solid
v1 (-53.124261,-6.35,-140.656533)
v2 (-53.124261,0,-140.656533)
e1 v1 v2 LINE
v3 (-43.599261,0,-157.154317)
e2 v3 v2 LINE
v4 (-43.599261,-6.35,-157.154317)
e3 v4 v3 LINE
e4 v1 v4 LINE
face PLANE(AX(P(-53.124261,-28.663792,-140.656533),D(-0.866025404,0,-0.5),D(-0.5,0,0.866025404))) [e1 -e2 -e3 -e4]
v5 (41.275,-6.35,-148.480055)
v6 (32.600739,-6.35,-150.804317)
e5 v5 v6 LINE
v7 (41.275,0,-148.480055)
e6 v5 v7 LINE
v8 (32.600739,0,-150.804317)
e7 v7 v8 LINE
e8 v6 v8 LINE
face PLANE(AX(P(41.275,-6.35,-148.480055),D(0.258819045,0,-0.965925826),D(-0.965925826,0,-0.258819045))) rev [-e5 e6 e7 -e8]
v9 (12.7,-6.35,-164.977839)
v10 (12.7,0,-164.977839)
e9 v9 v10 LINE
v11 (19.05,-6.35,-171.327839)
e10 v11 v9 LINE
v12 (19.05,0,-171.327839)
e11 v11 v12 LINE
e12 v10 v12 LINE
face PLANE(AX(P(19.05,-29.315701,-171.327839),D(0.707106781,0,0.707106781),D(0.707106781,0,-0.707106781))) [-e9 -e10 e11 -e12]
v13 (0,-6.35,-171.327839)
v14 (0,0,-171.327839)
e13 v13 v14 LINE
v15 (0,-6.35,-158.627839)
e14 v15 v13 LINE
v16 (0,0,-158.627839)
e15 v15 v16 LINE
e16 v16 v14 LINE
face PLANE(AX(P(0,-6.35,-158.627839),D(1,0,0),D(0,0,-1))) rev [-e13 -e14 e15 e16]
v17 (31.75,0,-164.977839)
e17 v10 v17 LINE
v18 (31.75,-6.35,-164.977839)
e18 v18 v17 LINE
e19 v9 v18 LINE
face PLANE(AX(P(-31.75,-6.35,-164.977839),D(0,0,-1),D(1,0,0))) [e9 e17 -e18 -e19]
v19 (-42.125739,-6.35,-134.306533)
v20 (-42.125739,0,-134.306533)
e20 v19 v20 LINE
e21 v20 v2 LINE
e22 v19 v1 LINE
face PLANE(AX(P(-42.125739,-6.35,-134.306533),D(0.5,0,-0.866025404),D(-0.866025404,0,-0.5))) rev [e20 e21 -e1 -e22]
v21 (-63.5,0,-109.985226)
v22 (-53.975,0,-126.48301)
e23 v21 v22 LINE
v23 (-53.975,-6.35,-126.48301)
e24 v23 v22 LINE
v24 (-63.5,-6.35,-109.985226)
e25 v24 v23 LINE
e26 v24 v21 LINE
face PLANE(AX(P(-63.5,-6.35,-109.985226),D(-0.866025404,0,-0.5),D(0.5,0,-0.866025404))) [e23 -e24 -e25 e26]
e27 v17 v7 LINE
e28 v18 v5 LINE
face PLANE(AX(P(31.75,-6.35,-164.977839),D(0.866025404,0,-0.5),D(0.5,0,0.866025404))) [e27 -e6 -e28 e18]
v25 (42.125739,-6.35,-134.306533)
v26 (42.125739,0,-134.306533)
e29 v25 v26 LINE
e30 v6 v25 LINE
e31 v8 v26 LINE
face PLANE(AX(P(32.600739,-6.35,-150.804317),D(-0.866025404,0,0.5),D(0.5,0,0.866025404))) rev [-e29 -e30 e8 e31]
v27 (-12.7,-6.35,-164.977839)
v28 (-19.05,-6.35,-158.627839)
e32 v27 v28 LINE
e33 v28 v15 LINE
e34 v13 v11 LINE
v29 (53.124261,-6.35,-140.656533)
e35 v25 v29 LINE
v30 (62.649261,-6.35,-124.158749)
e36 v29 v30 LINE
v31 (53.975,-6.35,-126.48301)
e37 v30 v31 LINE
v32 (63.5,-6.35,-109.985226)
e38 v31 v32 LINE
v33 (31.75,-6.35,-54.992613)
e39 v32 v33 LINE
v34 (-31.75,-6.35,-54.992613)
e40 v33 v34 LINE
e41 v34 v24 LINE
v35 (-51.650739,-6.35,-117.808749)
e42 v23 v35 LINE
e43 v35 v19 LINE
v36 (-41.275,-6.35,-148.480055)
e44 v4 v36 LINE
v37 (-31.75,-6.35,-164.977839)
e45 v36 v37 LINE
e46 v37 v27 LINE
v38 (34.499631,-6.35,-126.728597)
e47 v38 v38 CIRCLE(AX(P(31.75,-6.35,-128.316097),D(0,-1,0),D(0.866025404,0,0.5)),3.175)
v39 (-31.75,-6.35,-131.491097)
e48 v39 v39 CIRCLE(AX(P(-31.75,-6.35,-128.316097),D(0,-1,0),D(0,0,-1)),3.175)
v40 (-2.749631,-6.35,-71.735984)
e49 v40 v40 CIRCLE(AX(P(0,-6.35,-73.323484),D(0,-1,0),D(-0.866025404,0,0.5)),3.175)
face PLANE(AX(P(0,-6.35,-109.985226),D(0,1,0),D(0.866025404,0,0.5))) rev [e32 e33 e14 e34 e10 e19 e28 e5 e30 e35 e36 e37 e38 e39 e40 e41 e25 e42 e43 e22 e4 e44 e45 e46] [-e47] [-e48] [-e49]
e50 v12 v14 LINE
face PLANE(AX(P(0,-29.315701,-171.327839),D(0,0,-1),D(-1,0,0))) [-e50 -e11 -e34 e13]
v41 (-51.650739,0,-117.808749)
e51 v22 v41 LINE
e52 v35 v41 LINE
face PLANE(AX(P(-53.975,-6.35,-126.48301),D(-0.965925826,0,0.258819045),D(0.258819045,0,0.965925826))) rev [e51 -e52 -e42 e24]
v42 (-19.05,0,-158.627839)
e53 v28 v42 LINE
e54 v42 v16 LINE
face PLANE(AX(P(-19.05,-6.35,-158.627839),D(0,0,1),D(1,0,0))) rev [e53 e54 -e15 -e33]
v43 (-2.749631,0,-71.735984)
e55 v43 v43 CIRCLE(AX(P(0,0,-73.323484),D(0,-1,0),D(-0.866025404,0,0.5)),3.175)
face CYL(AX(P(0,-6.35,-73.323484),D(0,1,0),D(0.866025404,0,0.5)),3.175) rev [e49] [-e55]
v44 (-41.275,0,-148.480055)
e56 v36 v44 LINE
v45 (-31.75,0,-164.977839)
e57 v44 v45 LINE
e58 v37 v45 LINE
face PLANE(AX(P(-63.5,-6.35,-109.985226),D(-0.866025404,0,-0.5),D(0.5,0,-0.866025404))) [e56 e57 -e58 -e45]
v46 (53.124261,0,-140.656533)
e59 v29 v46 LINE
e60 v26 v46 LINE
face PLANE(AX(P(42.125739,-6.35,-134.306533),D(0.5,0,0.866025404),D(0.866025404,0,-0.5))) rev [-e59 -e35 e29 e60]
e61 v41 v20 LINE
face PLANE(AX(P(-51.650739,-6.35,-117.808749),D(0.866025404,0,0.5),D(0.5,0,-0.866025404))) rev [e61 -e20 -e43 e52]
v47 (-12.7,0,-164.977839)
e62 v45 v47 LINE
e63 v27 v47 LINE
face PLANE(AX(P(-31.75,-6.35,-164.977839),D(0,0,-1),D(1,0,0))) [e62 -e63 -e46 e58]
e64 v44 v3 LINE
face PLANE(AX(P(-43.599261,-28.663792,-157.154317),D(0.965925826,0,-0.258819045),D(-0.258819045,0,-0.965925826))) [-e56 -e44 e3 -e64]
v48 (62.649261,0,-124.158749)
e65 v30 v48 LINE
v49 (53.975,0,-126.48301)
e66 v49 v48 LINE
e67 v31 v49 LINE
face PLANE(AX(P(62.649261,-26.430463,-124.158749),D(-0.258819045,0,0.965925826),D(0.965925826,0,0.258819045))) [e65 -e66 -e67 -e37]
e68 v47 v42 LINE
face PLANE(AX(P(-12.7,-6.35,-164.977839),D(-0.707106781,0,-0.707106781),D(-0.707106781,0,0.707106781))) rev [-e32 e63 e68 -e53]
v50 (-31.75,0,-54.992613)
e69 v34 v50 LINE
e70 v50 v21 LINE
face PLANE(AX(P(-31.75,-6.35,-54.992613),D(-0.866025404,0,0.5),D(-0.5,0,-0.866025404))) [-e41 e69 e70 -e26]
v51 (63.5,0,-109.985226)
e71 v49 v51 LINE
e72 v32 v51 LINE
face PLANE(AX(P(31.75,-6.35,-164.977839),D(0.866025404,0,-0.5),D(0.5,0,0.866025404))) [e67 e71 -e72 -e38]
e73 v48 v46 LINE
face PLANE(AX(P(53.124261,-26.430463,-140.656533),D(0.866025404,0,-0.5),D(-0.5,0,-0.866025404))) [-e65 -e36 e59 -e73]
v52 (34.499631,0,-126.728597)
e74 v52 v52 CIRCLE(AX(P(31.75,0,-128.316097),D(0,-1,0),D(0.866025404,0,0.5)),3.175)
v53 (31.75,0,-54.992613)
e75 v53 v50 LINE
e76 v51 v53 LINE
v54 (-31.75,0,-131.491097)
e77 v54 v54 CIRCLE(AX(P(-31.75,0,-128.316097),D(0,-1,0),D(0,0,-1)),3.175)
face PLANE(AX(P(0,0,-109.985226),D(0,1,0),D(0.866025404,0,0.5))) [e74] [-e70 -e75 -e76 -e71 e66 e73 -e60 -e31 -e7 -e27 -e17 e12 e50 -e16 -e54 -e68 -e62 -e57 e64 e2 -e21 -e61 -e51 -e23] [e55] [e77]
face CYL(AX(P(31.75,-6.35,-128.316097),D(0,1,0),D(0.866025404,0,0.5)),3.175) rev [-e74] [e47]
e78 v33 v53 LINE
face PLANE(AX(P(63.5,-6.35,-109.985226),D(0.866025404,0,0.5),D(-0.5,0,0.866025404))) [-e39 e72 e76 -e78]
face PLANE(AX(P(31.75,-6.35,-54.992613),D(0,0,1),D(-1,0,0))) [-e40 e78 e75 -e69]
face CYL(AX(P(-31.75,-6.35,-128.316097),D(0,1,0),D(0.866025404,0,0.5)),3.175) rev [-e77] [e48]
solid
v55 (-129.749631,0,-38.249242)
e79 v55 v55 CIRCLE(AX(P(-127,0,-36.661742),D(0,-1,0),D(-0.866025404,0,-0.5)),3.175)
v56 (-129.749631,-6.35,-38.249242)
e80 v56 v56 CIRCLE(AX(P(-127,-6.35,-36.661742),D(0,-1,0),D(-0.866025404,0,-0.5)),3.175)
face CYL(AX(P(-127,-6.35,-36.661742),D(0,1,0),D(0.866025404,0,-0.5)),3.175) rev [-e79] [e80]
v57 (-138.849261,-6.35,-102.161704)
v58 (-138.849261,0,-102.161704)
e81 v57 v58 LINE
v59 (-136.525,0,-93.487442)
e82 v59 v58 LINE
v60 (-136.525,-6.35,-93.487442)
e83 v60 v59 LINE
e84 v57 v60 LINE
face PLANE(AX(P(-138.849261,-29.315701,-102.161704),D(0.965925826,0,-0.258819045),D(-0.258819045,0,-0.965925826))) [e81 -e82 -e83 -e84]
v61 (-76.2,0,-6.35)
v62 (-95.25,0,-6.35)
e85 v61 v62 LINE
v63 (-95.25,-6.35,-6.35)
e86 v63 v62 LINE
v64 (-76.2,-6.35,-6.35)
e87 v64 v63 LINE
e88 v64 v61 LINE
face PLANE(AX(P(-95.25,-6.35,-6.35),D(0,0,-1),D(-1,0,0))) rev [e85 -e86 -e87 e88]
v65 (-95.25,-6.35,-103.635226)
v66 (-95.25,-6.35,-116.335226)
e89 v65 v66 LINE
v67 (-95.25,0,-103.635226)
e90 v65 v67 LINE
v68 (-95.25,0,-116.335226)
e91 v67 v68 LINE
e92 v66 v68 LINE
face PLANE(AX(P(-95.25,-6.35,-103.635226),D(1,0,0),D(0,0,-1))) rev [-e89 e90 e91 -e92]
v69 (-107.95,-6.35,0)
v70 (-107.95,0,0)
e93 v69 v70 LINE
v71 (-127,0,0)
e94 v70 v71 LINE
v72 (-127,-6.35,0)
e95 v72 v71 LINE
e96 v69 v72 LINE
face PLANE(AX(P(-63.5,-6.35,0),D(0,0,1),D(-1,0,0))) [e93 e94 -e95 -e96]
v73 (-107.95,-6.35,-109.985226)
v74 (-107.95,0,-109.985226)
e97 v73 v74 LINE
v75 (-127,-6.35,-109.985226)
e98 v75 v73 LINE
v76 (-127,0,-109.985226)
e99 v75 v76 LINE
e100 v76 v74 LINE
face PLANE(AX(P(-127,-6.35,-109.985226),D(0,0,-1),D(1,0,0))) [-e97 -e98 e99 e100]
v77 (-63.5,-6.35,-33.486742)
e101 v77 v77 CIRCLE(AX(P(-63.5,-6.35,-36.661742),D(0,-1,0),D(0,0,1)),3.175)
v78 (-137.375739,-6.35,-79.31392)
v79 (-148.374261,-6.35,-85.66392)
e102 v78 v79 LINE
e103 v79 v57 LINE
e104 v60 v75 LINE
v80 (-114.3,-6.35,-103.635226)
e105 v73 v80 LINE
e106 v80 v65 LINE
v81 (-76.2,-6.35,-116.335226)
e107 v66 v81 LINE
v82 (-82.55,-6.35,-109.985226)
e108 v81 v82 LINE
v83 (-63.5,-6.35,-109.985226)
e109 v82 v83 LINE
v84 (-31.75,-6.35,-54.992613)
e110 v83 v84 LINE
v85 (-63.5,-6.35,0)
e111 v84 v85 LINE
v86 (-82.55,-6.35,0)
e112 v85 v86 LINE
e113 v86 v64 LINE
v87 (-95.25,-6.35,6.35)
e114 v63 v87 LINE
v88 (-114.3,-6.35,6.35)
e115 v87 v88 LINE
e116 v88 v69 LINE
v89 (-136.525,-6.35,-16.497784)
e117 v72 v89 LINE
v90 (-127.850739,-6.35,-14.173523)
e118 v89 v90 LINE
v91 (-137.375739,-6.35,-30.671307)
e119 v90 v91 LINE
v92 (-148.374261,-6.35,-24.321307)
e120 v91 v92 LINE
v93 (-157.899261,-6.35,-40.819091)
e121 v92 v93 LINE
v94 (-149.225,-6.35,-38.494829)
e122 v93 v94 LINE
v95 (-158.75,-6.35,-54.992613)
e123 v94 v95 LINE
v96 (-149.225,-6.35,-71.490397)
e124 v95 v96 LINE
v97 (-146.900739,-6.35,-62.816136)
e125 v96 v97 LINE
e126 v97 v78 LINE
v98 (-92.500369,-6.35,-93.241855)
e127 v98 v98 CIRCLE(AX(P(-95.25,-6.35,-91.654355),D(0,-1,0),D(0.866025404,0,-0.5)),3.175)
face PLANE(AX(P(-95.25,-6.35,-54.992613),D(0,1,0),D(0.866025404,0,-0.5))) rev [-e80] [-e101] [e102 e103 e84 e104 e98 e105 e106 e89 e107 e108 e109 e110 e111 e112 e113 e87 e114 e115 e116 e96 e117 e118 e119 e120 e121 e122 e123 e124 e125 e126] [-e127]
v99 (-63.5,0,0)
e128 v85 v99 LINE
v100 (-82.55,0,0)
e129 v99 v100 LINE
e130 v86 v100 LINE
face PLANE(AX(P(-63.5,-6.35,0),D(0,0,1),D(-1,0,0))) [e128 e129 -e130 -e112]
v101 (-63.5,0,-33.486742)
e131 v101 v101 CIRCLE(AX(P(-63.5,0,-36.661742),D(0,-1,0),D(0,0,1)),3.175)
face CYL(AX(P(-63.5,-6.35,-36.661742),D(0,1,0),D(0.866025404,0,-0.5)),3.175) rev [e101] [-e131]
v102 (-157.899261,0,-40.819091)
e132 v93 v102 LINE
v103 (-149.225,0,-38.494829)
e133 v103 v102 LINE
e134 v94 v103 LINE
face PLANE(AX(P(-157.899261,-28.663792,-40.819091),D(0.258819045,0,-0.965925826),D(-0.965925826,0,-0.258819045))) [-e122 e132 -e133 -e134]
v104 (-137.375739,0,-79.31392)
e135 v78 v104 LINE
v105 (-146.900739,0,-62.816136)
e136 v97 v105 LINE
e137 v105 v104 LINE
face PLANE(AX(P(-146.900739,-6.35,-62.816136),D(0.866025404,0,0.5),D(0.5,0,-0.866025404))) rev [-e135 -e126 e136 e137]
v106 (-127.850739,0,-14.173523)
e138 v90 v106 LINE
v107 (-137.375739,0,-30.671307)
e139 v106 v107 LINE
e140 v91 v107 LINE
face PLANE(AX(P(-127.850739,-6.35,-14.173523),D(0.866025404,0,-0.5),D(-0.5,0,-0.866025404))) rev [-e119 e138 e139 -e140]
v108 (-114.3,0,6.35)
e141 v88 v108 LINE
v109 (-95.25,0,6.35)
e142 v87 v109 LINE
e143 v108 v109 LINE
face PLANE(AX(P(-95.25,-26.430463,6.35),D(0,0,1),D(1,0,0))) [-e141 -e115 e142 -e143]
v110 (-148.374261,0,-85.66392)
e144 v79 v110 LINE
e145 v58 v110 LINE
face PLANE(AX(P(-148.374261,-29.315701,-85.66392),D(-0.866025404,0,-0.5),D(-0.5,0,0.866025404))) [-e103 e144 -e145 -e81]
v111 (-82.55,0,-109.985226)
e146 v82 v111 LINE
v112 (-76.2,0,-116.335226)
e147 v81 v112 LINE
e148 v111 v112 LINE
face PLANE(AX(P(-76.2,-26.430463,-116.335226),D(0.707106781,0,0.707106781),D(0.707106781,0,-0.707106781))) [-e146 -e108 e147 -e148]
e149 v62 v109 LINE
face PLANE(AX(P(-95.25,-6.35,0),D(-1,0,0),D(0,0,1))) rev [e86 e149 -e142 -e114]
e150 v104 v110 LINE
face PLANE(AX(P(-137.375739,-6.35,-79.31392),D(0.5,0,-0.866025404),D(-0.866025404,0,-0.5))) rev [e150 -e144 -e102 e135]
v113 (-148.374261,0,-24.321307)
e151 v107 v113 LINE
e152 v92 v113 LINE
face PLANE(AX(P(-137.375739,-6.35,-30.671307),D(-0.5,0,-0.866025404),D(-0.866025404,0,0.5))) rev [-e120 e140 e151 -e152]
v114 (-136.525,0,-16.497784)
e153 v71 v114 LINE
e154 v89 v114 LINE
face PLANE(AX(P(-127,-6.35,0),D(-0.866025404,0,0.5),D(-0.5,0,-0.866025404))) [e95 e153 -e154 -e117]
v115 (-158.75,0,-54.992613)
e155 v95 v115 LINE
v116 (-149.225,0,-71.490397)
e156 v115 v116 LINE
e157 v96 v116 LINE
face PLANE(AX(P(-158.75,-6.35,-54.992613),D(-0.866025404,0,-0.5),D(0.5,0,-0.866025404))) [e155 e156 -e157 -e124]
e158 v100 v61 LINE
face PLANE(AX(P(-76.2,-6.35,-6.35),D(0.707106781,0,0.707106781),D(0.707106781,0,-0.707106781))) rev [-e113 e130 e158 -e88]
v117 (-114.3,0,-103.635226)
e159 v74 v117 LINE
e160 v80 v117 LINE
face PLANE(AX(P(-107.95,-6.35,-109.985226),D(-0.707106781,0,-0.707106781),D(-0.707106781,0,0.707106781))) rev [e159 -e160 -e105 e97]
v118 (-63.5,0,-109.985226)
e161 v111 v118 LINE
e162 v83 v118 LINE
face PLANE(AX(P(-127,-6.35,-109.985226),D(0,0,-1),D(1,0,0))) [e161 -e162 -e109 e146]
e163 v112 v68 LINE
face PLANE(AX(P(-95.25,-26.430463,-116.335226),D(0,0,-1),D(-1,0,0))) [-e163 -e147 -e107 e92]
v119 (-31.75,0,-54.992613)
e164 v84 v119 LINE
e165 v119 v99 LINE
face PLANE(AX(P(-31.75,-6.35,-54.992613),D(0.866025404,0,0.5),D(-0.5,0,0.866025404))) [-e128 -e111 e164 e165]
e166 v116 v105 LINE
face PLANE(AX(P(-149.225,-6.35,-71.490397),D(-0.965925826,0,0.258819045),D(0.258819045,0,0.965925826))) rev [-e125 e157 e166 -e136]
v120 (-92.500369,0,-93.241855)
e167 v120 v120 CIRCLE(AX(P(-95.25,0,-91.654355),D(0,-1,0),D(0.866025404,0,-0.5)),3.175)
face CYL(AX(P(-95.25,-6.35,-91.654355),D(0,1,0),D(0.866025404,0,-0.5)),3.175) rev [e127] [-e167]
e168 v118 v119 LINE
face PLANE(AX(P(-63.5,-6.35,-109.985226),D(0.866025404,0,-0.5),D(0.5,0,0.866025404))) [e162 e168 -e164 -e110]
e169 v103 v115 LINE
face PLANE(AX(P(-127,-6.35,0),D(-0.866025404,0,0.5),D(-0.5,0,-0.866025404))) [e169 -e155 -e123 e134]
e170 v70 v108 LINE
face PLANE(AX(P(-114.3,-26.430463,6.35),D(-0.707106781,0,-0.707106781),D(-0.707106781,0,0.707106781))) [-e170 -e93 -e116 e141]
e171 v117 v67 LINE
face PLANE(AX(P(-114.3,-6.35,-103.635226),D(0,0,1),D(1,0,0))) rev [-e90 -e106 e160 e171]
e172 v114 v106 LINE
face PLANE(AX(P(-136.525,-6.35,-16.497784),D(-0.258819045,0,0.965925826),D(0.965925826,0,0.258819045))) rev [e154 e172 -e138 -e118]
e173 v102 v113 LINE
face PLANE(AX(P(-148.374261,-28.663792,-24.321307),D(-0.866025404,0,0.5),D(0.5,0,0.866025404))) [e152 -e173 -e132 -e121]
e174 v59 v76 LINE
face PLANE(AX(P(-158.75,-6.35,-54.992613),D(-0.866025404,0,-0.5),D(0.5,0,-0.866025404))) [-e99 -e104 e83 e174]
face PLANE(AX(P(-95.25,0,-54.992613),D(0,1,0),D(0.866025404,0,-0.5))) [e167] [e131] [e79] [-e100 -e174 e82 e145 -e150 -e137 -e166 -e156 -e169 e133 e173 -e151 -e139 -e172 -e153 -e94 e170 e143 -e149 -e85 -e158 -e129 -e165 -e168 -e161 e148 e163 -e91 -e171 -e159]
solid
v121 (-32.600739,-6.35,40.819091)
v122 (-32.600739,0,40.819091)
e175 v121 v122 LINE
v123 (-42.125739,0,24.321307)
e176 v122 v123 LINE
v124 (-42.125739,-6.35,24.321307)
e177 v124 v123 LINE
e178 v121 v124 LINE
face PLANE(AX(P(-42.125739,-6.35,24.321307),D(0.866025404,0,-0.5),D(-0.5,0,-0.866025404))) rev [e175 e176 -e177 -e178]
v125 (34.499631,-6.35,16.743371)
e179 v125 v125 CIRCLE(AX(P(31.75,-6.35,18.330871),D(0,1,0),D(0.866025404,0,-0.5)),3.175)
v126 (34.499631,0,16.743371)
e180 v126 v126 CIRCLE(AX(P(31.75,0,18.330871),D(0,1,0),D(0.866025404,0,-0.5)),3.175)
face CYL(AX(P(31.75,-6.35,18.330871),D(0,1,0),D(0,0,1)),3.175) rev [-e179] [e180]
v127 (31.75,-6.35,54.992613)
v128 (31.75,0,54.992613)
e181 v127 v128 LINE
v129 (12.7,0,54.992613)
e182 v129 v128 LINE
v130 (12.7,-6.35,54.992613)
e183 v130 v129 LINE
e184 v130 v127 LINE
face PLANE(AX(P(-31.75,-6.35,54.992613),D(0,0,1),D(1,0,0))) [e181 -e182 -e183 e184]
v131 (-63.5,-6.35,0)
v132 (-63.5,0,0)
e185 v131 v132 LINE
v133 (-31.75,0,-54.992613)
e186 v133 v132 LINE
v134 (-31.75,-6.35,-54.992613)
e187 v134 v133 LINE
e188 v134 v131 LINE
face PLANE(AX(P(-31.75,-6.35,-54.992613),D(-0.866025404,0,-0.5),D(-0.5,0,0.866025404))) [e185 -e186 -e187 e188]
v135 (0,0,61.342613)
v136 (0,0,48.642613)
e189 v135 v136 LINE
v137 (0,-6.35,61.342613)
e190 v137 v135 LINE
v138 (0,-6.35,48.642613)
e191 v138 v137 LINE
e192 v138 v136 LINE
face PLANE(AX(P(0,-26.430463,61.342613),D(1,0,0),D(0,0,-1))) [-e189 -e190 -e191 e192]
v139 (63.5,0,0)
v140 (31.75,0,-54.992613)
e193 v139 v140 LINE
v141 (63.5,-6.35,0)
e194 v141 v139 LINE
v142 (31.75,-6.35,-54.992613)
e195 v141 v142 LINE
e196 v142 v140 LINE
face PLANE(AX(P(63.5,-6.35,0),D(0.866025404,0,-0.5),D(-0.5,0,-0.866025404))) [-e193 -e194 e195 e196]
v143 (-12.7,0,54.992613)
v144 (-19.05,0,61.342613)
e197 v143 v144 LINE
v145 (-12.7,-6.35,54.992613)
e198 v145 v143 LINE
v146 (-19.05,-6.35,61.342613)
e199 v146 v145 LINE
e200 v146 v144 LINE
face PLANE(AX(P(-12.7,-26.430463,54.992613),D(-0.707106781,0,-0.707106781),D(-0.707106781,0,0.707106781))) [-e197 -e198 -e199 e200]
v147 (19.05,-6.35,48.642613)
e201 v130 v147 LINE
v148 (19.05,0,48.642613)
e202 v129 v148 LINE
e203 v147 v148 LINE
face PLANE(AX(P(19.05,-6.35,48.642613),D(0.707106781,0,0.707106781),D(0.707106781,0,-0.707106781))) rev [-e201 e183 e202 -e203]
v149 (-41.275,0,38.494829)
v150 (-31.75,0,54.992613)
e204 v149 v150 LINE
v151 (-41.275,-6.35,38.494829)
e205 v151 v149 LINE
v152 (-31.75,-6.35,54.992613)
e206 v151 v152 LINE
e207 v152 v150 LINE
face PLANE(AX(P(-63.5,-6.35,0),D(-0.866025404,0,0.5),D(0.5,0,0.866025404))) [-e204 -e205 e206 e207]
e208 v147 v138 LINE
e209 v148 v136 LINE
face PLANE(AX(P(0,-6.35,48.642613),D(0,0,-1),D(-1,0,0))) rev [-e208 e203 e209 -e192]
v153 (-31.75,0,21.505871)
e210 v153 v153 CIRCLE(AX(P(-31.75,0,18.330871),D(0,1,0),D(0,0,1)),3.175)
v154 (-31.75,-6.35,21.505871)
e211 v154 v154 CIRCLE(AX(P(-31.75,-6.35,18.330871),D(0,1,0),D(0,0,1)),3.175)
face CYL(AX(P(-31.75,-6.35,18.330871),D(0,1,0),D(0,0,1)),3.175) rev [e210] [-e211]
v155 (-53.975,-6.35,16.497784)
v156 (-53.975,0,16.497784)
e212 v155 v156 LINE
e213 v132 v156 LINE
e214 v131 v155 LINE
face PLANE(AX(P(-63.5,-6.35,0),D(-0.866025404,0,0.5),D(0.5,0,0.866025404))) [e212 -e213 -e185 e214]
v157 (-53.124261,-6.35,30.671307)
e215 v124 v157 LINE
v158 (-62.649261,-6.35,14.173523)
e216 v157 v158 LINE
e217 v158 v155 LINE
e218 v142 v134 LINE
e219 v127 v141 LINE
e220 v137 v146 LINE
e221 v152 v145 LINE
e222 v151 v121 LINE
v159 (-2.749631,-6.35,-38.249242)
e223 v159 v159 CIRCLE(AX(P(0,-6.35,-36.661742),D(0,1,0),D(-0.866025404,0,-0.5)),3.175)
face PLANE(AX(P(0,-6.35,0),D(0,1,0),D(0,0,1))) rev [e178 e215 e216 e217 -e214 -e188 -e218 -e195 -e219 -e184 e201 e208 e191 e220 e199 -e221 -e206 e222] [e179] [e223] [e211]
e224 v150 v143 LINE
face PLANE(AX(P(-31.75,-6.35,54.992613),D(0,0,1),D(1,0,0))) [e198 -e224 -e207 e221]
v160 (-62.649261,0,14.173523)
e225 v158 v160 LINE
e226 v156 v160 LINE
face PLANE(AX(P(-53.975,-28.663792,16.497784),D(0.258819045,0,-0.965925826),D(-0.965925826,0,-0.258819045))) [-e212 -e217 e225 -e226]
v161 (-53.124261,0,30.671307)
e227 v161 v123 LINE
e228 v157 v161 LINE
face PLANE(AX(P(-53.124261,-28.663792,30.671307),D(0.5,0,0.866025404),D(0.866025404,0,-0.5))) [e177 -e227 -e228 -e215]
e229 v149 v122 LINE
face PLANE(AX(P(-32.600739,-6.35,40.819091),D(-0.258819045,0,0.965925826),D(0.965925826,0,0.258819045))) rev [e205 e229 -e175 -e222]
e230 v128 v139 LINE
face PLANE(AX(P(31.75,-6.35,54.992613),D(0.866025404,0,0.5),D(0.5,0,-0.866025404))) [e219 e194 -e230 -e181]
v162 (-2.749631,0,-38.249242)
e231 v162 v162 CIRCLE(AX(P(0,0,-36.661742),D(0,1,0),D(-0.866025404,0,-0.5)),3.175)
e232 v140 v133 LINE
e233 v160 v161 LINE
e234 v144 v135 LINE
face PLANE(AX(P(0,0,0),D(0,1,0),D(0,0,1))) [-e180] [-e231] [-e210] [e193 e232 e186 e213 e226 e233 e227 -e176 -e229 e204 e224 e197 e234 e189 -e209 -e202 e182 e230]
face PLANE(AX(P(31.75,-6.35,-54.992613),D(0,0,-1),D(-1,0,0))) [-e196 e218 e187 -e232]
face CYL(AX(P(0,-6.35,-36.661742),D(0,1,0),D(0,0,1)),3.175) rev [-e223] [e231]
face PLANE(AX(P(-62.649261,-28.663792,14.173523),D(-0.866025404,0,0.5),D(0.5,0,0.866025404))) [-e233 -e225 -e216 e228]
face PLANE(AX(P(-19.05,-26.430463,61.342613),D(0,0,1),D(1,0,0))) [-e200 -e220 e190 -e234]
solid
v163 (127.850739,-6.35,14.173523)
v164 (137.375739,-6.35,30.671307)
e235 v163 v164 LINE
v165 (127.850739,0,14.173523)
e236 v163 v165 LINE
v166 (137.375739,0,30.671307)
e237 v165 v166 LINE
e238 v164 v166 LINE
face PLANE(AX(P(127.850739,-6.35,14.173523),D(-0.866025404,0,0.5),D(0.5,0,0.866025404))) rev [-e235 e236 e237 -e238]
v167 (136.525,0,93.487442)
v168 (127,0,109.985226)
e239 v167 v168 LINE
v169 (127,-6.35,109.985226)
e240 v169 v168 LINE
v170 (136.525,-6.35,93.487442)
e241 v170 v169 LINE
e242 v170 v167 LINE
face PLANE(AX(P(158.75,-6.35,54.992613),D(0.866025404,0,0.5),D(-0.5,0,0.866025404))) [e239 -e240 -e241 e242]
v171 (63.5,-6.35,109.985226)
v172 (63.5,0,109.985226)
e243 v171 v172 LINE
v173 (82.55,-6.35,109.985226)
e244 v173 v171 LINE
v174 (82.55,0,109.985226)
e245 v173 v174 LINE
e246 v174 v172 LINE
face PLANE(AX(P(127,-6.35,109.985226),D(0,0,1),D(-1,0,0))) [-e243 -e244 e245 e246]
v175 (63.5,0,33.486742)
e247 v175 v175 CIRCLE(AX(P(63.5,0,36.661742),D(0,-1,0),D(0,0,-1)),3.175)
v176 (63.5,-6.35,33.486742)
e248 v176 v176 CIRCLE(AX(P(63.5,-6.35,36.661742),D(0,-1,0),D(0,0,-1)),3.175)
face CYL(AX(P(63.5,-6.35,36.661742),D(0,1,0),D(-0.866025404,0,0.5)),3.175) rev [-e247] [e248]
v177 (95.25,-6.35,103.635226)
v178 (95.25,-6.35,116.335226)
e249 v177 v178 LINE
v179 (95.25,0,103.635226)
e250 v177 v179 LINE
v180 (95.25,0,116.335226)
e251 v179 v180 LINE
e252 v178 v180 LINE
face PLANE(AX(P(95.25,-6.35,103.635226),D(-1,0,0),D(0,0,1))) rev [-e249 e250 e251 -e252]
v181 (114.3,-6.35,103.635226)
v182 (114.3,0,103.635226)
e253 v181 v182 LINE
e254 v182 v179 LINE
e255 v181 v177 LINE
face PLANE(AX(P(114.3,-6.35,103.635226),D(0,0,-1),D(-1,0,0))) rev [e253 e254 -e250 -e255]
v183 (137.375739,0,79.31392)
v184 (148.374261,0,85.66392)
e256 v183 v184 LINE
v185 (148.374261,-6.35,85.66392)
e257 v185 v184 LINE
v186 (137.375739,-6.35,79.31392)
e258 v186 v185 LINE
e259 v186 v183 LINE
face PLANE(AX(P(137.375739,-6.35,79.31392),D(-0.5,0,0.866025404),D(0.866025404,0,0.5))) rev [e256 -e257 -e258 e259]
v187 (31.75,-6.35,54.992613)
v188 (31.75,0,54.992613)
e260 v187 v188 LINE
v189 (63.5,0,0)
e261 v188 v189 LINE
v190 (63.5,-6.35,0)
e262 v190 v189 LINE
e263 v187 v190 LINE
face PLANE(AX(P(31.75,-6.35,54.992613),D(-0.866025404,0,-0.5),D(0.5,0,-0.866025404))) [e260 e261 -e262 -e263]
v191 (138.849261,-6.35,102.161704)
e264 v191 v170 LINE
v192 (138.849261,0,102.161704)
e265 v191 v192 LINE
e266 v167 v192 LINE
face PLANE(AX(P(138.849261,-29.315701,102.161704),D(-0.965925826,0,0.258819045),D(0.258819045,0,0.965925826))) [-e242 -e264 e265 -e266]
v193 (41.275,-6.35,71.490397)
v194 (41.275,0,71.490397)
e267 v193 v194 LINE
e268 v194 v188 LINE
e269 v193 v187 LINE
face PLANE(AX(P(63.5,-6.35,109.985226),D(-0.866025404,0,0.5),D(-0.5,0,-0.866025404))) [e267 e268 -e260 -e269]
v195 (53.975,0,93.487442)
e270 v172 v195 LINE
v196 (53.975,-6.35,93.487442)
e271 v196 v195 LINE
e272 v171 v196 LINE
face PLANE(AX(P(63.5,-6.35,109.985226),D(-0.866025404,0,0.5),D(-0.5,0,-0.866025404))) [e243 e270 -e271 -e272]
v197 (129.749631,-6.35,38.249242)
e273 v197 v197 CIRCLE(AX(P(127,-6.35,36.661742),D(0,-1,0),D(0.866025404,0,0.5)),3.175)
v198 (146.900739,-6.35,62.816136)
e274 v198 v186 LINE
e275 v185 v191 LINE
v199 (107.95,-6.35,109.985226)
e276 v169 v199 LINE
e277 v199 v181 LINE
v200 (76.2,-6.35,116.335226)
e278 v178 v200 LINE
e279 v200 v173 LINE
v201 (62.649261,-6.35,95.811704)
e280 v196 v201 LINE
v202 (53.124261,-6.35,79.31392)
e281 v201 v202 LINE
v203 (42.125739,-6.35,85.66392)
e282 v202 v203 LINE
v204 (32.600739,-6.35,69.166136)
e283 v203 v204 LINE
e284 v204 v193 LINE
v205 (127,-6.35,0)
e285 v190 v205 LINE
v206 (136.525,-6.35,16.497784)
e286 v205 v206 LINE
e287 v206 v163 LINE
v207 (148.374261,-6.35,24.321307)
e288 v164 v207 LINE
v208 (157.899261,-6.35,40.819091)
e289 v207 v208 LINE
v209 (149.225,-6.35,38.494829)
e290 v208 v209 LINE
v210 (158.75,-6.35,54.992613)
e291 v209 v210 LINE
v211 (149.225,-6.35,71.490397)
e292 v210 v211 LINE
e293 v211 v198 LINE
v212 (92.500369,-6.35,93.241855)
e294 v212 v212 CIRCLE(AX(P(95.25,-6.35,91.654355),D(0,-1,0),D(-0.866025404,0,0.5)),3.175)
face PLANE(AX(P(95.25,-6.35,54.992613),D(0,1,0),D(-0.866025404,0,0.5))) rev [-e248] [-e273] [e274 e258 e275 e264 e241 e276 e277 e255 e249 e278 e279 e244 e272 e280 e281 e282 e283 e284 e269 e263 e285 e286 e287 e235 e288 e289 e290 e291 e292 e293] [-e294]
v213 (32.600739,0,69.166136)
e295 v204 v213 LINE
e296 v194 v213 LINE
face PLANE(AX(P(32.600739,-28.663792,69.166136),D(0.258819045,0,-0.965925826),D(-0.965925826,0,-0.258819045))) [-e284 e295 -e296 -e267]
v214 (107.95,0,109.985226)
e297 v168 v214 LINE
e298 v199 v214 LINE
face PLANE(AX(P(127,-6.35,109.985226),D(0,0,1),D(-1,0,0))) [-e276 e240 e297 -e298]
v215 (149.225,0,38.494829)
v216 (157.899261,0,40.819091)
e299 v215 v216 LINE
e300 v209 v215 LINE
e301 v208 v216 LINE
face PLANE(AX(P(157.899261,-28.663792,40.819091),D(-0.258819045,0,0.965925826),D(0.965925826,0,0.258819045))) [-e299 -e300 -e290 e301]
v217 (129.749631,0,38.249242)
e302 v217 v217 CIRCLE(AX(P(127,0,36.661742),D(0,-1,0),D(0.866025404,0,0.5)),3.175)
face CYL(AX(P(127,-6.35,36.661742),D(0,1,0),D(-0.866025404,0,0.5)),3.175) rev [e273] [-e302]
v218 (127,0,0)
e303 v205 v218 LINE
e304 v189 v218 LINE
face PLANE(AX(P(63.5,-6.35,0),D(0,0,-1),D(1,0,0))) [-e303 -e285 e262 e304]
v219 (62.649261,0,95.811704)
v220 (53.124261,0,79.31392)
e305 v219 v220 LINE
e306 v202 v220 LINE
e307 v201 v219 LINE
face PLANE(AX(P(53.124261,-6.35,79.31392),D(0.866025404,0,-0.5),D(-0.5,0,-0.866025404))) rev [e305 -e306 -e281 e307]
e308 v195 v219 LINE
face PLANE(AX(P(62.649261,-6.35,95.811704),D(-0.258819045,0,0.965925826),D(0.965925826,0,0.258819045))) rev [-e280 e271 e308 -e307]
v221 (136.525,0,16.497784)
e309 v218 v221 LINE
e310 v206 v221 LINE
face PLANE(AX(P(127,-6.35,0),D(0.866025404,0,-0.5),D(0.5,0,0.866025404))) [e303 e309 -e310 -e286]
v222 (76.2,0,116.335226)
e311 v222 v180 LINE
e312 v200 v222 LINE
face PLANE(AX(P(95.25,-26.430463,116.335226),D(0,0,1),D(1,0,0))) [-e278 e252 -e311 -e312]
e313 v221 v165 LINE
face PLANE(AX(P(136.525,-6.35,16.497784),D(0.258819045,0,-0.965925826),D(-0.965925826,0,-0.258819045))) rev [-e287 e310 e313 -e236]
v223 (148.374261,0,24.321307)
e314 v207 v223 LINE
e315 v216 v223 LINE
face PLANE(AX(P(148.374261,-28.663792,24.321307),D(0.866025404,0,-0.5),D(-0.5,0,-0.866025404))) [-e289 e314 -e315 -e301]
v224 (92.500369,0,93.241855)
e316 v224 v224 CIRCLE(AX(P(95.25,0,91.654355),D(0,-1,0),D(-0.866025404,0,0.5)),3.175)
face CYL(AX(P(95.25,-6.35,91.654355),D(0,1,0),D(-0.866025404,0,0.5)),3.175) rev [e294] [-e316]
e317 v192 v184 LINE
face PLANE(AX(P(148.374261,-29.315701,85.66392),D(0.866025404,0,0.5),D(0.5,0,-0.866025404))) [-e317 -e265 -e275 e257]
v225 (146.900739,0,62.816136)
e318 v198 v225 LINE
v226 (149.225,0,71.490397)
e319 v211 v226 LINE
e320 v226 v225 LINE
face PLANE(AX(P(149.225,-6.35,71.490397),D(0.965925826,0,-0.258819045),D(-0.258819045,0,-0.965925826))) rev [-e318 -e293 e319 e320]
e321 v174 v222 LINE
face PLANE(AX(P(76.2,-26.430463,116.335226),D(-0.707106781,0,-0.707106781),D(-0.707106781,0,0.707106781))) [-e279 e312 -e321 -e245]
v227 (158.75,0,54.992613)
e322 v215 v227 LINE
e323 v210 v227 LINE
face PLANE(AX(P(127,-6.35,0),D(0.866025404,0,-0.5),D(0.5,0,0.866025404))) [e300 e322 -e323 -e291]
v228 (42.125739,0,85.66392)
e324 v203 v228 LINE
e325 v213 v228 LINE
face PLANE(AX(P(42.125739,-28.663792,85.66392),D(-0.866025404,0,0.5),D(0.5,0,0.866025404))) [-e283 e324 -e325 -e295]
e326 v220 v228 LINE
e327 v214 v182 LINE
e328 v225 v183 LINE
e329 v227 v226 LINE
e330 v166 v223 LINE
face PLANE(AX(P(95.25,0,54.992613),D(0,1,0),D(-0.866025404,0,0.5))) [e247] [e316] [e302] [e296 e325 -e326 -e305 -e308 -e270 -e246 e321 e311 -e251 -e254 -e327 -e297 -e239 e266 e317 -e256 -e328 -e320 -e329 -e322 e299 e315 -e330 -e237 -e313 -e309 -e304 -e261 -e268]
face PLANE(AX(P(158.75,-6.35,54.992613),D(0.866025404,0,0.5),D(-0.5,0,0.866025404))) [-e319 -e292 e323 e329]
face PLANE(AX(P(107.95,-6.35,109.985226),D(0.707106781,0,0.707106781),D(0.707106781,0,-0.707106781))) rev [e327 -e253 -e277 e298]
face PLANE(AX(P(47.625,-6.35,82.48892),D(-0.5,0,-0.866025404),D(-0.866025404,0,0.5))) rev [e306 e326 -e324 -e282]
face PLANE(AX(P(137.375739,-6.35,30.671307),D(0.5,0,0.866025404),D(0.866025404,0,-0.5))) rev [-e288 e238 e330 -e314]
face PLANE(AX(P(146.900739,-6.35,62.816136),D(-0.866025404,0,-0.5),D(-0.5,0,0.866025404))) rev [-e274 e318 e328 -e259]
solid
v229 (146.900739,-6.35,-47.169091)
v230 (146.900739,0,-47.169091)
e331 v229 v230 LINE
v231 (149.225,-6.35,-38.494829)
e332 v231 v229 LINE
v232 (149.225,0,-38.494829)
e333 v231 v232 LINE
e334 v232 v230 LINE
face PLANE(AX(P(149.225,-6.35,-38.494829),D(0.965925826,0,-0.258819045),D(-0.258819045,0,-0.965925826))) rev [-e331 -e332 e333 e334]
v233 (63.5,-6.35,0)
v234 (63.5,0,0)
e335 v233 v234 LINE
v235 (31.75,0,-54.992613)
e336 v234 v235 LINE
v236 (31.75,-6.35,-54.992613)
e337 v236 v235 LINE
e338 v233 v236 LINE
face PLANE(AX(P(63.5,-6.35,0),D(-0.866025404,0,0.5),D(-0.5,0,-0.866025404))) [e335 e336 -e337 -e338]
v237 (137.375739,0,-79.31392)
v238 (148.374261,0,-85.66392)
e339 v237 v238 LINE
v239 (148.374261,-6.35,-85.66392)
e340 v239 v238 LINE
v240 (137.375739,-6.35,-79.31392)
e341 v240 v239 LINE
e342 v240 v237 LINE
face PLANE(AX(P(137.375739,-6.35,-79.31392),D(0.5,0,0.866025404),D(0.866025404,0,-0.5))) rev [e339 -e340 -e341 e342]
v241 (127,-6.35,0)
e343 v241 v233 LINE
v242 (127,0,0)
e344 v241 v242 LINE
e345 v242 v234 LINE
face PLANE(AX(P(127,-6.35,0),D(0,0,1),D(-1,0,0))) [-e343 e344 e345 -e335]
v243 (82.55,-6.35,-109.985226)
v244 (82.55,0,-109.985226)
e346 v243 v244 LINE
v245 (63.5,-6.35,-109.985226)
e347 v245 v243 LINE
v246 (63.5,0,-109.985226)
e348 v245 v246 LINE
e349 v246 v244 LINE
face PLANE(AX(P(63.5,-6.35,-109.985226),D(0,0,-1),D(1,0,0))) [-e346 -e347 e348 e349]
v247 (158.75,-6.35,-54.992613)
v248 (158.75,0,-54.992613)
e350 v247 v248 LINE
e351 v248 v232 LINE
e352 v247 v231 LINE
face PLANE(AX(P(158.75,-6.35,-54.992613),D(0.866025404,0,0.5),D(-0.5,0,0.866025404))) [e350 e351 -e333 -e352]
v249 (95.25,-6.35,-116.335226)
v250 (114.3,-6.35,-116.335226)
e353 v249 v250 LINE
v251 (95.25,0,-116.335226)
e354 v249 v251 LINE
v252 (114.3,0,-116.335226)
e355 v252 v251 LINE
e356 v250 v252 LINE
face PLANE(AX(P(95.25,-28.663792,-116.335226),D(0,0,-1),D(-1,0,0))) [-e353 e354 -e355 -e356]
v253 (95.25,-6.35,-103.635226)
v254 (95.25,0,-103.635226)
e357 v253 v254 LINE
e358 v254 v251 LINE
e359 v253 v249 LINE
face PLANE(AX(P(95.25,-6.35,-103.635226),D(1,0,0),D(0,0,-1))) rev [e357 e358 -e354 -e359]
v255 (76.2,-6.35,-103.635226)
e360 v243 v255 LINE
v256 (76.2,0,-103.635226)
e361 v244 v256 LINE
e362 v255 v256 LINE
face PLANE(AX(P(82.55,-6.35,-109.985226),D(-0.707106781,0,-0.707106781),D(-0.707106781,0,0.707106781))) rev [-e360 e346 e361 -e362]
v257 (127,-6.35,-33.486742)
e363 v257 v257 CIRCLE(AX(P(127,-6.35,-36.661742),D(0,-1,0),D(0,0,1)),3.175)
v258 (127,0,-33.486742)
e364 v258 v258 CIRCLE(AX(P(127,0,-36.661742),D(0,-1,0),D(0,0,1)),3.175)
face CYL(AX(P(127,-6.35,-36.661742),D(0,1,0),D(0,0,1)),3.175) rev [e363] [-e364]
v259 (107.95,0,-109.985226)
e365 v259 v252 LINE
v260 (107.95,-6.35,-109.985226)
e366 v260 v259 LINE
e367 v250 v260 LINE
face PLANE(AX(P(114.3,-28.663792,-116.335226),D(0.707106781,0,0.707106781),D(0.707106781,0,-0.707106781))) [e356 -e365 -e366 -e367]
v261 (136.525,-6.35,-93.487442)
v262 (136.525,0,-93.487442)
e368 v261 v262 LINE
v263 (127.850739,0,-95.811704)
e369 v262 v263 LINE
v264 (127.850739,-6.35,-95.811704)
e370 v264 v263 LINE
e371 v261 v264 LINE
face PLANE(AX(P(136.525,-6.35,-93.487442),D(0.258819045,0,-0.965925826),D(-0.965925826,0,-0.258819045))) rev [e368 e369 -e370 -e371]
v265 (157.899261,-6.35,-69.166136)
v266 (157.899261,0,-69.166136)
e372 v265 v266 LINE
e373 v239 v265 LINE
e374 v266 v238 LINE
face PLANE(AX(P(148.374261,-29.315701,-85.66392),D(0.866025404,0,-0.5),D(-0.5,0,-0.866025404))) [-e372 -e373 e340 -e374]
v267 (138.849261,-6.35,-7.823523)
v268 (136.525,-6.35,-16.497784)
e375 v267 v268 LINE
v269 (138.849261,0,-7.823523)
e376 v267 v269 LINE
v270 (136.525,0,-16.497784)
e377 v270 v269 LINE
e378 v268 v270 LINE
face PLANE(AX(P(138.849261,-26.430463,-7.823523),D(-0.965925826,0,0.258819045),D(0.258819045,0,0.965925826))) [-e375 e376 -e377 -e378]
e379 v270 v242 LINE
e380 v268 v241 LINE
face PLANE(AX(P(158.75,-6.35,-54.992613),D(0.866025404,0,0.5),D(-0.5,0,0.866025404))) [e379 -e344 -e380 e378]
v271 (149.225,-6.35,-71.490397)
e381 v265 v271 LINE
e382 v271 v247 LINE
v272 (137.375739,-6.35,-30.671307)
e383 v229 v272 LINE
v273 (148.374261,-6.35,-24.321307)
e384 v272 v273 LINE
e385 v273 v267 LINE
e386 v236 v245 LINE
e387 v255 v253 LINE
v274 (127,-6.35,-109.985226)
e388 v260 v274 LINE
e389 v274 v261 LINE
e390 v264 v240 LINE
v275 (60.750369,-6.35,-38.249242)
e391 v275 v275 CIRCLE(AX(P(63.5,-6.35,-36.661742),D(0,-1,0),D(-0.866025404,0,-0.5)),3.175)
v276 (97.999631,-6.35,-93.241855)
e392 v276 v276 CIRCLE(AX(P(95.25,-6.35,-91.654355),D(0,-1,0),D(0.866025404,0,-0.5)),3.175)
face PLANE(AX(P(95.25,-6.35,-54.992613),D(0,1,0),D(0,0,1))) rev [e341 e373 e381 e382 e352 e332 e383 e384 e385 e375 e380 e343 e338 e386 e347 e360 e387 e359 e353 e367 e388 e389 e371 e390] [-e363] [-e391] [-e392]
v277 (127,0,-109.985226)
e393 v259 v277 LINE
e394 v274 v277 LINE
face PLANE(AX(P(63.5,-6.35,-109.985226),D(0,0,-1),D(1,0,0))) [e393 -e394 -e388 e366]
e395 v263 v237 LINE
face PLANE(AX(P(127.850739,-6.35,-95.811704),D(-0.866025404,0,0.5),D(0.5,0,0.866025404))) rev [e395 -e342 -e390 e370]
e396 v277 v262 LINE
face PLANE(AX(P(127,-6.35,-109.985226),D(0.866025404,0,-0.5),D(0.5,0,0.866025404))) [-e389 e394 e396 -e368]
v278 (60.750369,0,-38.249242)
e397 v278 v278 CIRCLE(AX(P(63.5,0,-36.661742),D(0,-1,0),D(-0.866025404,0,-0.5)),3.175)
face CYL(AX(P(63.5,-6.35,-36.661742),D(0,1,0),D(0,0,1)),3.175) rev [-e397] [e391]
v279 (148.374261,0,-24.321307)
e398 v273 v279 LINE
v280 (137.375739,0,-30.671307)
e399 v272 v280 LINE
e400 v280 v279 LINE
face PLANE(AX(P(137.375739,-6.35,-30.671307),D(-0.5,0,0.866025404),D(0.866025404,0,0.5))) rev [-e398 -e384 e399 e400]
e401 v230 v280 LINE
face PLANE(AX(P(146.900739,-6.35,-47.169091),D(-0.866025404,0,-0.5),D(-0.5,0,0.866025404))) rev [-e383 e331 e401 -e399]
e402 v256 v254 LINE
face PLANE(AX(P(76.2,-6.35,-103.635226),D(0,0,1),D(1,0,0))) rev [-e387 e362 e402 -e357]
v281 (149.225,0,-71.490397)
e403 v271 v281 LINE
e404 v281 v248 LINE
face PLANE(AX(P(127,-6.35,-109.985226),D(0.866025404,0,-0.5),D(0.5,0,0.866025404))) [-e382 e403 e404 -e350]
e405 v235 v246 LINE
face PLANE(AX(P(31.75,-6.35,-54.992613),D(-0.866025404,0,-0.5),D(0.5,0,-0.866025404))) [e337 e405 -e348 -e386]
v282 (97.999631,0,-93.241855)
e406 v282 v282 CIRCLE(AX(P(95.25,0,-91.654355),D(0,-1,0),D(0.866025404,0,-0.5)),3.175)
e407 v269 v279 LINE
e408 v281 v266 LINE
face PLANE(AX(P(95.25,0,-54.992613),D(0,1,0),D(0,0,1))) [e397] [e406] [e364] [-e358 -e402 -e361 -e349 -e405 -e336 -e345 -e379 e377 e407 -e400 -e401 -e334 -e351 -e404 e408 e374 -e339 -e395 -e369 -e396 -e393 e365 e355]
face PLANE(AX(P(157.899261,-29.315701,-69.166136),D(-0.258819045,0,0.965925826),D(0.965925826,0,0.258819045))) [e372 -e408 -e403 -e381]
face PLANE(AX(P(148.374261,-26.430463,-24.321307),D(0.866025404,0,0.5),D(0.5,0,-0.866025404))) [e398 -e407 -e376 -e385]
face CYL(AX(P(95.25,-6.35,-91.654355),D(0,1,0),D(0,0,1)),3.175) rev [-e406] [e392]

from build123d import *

# Parameters (mm, degrees)
BOSS_EXTRUDE1_DEPTH     = 6.35
SKETCH9_R               = 3.175
CUT_EXTRUDE3_DEPTH      = 85.242269675
CIRPATTERN6_COUNT       = 3
CUT_EXTRUDE2_DEPTH      = 194.232075495
BOSS_EXTRUDE3_DEPTH     = 6.35
CIRPATTERN3_COUNT       = 3
CIRPATTERN3_ANGLE       = 120
CIRPATTERN5_START       = -6.35
CIRPATTERN5_OUTLINE_R   = 3.175
CIRPATTERN5_DEPTH       = 6.35
CIRPATTERN5_2_OUTLINE_R = 3.175
CIRPATTERN5_2_DEPTH     = 6.35
CIRPATTERN5_3_OUTLINE_R = 3.175
CIRPATTERN5_3_DEPTH     = 6.35
BOSS_EXTRUDE4_DEPTH     = 6.35
CUT_EXTRUDE4_DEPTH      = 234.655972662
CIRPATTERN7_COUNT       = 2
CIRPATTERN7_ANGLE       = 60
CUT_EXTRUDE5_DEPTH      = 234.655972662
BOSS_EXTRUDE5_DEPTH     = 6.35
CUT_EXTRUDE6_DEPTH      = 234.655972662
BOSS_EXTRUDE6_DEPTH     = 6.35


# Read off the part's stored shape, not the designer's step: CirPattern5
with BuildPart() as part:
    # Sketch1 → Boss-Extrude1 (new body)
    with BuildSketch(Plane(origin=(0, 0, 0), x_dir=(1, 0, 0), z_dir=(0, 1, 0))):
        Polygon((63.5, 0), (31.75, 54.99261314), (-31.75, 54.99261314), (-63.5, 0), (-31.75, -54.99261314), (31.75, -54.99261314), align=None)
    extrude(amount=-BOSS_EXTRUDE1_DEPTH)

    # Sketch9 → Cut-Extrude3 (cut, through all)
    with BuildSketch(Plane(origin=(0, 0, 0), x_dir=(1, 0, 0), z_dir=(0, 1, 0))):
        with Locations(Location((-31.75, -18.330871047, 0), (0, 0, 270))):
            Circle(SKETCH9_R)
    cut_extrude3 = extrude(amount=-CUT_EXTRUDE3_DEPTH, mode=Mode.SUBTRACT)

    # CirPattern6: Cut-Extrude3 ×3 about axis
    cirpattern6_axis = Axis((0, 0, 0), (0, 1, 0))
    for i in range(1, CIRPATTERN6_COUNT):
        add(cut_extrude3.rotate(cirpattern6_axis, i * 360 / CIRPATTERN6_COUNT), mode=Mode.SUBTRACT)


with BuildPart() as body_2:
    # Mirror1: mirrored copy
    add(part.part.mirror(Plane(origin=(31.75, -6.35, 54.99261314), x_dir=(-0.4999999999999997, 0, 0.8660254037844387), z_dir=(0.8660254037844387, 0, 0.49999999999999983))))

    # Sketch5 → Cut-Extrude2 (cut, through all)
    with BuildSketch(Plane(origin=(0, 0, 0), x_dir=(1, 0, 0), z_dir=(0, 1, 0))):
        Polygon((136.525, -16.497783942), (127.850738686, -14.173522628), (137.375738686, -30.67130657), (142.875, -27.49630657), align=None)
    cut_extrude2 = extrude(amount=-CUT_EXTRUDE2_DEPTH, mode=Mode.SUBTRACT)

    # Sketch7 → Boss-Extrude3 (add)
    with BuildSketch(Plane(origin=(0, 0, 0), x_dir=(1, 0, 0), z_dir=(0, 1, 0))):
        Polygon((142.875, -27.49630657), (148.374261314, -24.32130657), (157.899261314, -40.819090512), (149.225, -38.494829198), align=None)
    boss_extrude3 = extrude(amount=-BOSS_EXTRUDE3_DEPTH)

    # CirPattern3: Cut-Extrude2, Boss-Extrude3 ×3 about axis
    cirpattern3_axis = Axis((95.25, 0, 54.99261314), (0, -1, 0))
    add([cut_extrude2.rotate(cirpattern3_axis, i * CIRPATTERN3_ANGLE / (CIRPATTERN3_COUNT - 1)) for i in range(1, CIRPATTERN3_COUNT)], mode=Mode.SUBTRACT)
    add([boss_extrude3.rotate(cirpattern3_axis, i * CIRPATTERN3_ANGLE / (CIRPATTERN3_COUNT - 1)) for i in range(1, CIRPATTERN3_COUNT)])

    # Sketch14 → Cut-Extrude6 (cut, through all)
    with BuildSketch(Plane(origin=(0, 0, 0), x_dir=(1, 0, 0), z_dir=(0, 1, 0))):
        Polygon((47.625, -82.48891971), (53.124261314, -79.31391971), (62.649261314, -95.811703653), (53.975, -93.487442339), align=None)
    extrude(amount=-CUT_EXTRUDE6_DEPTH, mode=Mode.SUBTRACT)

    # Sketch15 → Boss-Extrude6 (add)
    with BuildSketch(Plane(origin=(0, 0, 0), x_dir=(1, 0, 0), z_dir=(0, 1, 0))):
        Polygon((47.625, -82.48891971), (42.125738686, -85.66391971), (32.600738686, -69.166135768), (41.275, -71.490397082), align=None)
    extrude(amount=-BOSS_EXTRUDE6_DEPTH)


with BuildPart() as body_3:
    # CirPattern5 outline → CirPattern5 (new body)
    with BuildSketch(Plane(origin=(0, 0, 0), x_dir=(1, 0, 0), z_dir=(0, 1, 0)).offset(CIRPATTERN5_START)):
        Polygon((-31.75, 54.99261314), (-63.5, 109.985226281), (-82.55, 109.985226281), (-76.2, 116.335226281), (-95.25, 116.335226281), (-95.25, 103.635226281), (-114.3, 103.635226281), (-107.95, 109.985226281), (-127, 109.985226281), (-136.525, 93.487442339), (-138.849261314, 102.161703653), (-148.374261314, 85.66391971), (-137.375738686, 79.31391971), (-146.900738686, 62.816135768), (-149.225, 71.490397082), (-158.75, 54.99261314), (-149.225, 38.494829198), (-157.899261314, 40.819090512), (-148.374261314, 24.32130657), (-137.375738686, 30.67130657), (-127.850738686, 14.173522628), (-136.525, 16.497783942), (-127, 0), (-63.5, 0), align=None)
        with Locations((-127, 36.661742094)):
            Circle(CIRPATTERN5_OUTLINE_R, mode=Mode.SUBTRACT)
        with Locations((-63.5, 36.661742094)):
            Circle(CIRPATTERN5_OUTLINE_R, mode=Mode.SUBTRACT)
        with Locations((-95.25, 91.654355234)):
            Circle(CIRPATTERN5_OUTLINE_R, mode=Mode.SUBTRACT)
    extrude(amount=CIRPATTERN5_DEPTH)

    # Sketch12 → Cut-Extrude5 (cut, through all)
    with BuildSketch(Plane(origin=(0, 0, 0), x_dir=(1, 0, 0), z_dir=(0, 1, 0))):
        Polygon((-95.25, 0), (-95.25, 6.35), (-76.2, 6.35), (-82.55, 0), align=None)
    extrude(amount=-CUT_EXTRUDE5_DEPTH, mode=Mode.SUBTRACT)

    # Sketch13 → Boss-Extrude5 (add)
    with BuildSketch(Plane(origin=(0, 0, 0), x_dir=(1, 0, 0), z_dir=(0, 1, 0))):
        Polygon((-95.25, 0), (-95.25, -6.35), (-114.3, -6.35), (-107.95, 0), align=None)
    extrude(amount=-BOSS_EXTRUDE5_DEPTH)


with BuildPart() as body_4:
    # CirPattern5 2 outline → CirPattern5 2 (new body)
    with BuildSketch(Plane(origin=(0, 0, 0), x_dir=(1, 0, 0), z_dir=(0, 1, 0)).offset(CIRPATTERN5_START)):
        Polygon((31.75, 54.99261314), (63.5, 109.985226281), (53.975, 126.483010223), (62.649261314, 124.158748909), (53.124261314, 140.656532851), (42.125738686, 134.306532851), (32.600738686, 150.804316793), (41.275, 148.480055479), (31.75, 164.977839421), (12.7, 164.977839421), (19.05, 171.327839421), (0, 171.327839421), (0, 158.627839421), (-19.05, 158.627839421), (-12.7, 164.977839421), (-31.75, 164.977839421), (-41.275, 148.480055479), (-43.599261314, 157.154316793), (-53.124261314, 140.656532851), (-42.125738686, 134.306532851), (-51.650738686, 117.808748909), (-53.975, 126.483010223), (-63.5, 109.985226281), (-31.75, 54.99261314), align=None)
        with Locations((0, 73.323484187)):
            Circle(CIRPATTERN5_2_OUTLINE_R, mode=Mode.SUBTRACT)
        with Locations((-31.75, 128.316097327)):
            Circle(CIRPATTERN5_2_OUTLINE_R, mode=Mode.SUBTRACT)
        with Locations((31.75, 128.316097327)):
            Circle(CIRPATTERN5_2_OUTLINE_R, mode=Mode.SUBTRACT)
    extrude(amount=CIRPATTERN5_2_DEPTH)


with BuildPart() as body_5:
    # CirPattern5 3 outline → CirPattern5 3 (new body)
    with BuildSketch(Plane(origin=(0, 0, 0), x_dir=(1, 0, 0), z_dir=(0, 1, 0)).offset(CIRPATTERN5_START)):
        Polygon((63.5, 0), (127, 0), (136.525, 16.497783942), (138.849261314, 7.823522628), (148.374261314, 24.32130657), (137.375738686, 30.67130657), (146.900738686, 47.169090512), (149.225, 38.494829198), (158.75, 54.99261314), (149.225, 71.490397082), (157.899261314, 69.166135768), (148.374261314, 85.66391971), (137.375738686, 79.31391971), (127.850738686, 95.811703653), (136.525, 93.487442339), (127, 109.985226281), (107.95, 109.985226281), (114.3, 116.335226281), (95.25, 116.335226281), (95.25, 103.635226281), (76.2, 103.635226281), (82.55, 109.985226281), (63.5, 109.985226281), (31.75, 54.99261314), align=None)
        with Locations((63.5, 36.661742094)):
            Circle(CIRPATTERN5_3_OUTLINE_R, mode=Mode.SUBTRACT)
        with Locations((127, 36.661742094)):
            Circle(CIRPATTERN5_3_OUTLINE_R, mode=Mode.SUBTRACT)
        with Locations((95.25, 91.654355234)):
            Circle(CIRPATTERN5_3_OUTLINE_R, mode=Mode.SUBTRACT)
    extrude(amount=CIRPATTERN5_3_DEPTH)


with BuildPart() as part_1:
    add(part.part)

    # Sketch10 → Boss-Extrude4 (add)
    with BuildSketch(Plane(origin=(0, 0, 0), x_dir=(1, 0, 0), z_dir=(0, 1, 0))):
        Polygon((-53.975, -16.497783942), (-62.649261314, -14.173522628), (-53.124261314, -30.67130657), (-47.625, -27.49630657), align=None)
    boss_extrude4 = extrude(amount=-BOSS_EXTRUDE4_DEPTH)

    # Sketch11 → Cut-Extrude4 (cut, through all)
    with BuildSketch(Plane(origin=(0, 0, 0), x_dir=(1, 0, 0), z_dir=(0, 1, 0))):
        Polygon((-47.625, -27.49630657), (-42.125738686, -24.32130657), (-32.600738686, -40.819090512), (-41.275, -38.494829198), align=None)
    cut_extrude4 = extrude(amount=-CUT_EXTRUDE4_DEPTH, mode=Mode.SUBTRACT)

    # CirPattern7: Boss-Extrude4, Cut-Extrude4 ×2 about axis
    cirpattern7_axis = Axis((0, 0, 0), (0, 1, 0))
    add([boss_extrude4.rotate(cirpattern7_axis, i * CIRPATTERN7_ANGLE / (CIRPATTERN7_COUNT - 1)) for i in range(1, CIRPATTERN7_COUNT)])
    add([cut_extrude4.rotate(cirpattern7_axis, i * CIRPATTERN7_ANGLE / (CIRPATTERN7_COUNT - 1)) for i in range(1, CIRPATTERN7_COUNT)], mode=Mode.SUBTRACT)


solid = Compound([body_2.part, body_3.part, body_4.part, body_5.part, part_1.part])
